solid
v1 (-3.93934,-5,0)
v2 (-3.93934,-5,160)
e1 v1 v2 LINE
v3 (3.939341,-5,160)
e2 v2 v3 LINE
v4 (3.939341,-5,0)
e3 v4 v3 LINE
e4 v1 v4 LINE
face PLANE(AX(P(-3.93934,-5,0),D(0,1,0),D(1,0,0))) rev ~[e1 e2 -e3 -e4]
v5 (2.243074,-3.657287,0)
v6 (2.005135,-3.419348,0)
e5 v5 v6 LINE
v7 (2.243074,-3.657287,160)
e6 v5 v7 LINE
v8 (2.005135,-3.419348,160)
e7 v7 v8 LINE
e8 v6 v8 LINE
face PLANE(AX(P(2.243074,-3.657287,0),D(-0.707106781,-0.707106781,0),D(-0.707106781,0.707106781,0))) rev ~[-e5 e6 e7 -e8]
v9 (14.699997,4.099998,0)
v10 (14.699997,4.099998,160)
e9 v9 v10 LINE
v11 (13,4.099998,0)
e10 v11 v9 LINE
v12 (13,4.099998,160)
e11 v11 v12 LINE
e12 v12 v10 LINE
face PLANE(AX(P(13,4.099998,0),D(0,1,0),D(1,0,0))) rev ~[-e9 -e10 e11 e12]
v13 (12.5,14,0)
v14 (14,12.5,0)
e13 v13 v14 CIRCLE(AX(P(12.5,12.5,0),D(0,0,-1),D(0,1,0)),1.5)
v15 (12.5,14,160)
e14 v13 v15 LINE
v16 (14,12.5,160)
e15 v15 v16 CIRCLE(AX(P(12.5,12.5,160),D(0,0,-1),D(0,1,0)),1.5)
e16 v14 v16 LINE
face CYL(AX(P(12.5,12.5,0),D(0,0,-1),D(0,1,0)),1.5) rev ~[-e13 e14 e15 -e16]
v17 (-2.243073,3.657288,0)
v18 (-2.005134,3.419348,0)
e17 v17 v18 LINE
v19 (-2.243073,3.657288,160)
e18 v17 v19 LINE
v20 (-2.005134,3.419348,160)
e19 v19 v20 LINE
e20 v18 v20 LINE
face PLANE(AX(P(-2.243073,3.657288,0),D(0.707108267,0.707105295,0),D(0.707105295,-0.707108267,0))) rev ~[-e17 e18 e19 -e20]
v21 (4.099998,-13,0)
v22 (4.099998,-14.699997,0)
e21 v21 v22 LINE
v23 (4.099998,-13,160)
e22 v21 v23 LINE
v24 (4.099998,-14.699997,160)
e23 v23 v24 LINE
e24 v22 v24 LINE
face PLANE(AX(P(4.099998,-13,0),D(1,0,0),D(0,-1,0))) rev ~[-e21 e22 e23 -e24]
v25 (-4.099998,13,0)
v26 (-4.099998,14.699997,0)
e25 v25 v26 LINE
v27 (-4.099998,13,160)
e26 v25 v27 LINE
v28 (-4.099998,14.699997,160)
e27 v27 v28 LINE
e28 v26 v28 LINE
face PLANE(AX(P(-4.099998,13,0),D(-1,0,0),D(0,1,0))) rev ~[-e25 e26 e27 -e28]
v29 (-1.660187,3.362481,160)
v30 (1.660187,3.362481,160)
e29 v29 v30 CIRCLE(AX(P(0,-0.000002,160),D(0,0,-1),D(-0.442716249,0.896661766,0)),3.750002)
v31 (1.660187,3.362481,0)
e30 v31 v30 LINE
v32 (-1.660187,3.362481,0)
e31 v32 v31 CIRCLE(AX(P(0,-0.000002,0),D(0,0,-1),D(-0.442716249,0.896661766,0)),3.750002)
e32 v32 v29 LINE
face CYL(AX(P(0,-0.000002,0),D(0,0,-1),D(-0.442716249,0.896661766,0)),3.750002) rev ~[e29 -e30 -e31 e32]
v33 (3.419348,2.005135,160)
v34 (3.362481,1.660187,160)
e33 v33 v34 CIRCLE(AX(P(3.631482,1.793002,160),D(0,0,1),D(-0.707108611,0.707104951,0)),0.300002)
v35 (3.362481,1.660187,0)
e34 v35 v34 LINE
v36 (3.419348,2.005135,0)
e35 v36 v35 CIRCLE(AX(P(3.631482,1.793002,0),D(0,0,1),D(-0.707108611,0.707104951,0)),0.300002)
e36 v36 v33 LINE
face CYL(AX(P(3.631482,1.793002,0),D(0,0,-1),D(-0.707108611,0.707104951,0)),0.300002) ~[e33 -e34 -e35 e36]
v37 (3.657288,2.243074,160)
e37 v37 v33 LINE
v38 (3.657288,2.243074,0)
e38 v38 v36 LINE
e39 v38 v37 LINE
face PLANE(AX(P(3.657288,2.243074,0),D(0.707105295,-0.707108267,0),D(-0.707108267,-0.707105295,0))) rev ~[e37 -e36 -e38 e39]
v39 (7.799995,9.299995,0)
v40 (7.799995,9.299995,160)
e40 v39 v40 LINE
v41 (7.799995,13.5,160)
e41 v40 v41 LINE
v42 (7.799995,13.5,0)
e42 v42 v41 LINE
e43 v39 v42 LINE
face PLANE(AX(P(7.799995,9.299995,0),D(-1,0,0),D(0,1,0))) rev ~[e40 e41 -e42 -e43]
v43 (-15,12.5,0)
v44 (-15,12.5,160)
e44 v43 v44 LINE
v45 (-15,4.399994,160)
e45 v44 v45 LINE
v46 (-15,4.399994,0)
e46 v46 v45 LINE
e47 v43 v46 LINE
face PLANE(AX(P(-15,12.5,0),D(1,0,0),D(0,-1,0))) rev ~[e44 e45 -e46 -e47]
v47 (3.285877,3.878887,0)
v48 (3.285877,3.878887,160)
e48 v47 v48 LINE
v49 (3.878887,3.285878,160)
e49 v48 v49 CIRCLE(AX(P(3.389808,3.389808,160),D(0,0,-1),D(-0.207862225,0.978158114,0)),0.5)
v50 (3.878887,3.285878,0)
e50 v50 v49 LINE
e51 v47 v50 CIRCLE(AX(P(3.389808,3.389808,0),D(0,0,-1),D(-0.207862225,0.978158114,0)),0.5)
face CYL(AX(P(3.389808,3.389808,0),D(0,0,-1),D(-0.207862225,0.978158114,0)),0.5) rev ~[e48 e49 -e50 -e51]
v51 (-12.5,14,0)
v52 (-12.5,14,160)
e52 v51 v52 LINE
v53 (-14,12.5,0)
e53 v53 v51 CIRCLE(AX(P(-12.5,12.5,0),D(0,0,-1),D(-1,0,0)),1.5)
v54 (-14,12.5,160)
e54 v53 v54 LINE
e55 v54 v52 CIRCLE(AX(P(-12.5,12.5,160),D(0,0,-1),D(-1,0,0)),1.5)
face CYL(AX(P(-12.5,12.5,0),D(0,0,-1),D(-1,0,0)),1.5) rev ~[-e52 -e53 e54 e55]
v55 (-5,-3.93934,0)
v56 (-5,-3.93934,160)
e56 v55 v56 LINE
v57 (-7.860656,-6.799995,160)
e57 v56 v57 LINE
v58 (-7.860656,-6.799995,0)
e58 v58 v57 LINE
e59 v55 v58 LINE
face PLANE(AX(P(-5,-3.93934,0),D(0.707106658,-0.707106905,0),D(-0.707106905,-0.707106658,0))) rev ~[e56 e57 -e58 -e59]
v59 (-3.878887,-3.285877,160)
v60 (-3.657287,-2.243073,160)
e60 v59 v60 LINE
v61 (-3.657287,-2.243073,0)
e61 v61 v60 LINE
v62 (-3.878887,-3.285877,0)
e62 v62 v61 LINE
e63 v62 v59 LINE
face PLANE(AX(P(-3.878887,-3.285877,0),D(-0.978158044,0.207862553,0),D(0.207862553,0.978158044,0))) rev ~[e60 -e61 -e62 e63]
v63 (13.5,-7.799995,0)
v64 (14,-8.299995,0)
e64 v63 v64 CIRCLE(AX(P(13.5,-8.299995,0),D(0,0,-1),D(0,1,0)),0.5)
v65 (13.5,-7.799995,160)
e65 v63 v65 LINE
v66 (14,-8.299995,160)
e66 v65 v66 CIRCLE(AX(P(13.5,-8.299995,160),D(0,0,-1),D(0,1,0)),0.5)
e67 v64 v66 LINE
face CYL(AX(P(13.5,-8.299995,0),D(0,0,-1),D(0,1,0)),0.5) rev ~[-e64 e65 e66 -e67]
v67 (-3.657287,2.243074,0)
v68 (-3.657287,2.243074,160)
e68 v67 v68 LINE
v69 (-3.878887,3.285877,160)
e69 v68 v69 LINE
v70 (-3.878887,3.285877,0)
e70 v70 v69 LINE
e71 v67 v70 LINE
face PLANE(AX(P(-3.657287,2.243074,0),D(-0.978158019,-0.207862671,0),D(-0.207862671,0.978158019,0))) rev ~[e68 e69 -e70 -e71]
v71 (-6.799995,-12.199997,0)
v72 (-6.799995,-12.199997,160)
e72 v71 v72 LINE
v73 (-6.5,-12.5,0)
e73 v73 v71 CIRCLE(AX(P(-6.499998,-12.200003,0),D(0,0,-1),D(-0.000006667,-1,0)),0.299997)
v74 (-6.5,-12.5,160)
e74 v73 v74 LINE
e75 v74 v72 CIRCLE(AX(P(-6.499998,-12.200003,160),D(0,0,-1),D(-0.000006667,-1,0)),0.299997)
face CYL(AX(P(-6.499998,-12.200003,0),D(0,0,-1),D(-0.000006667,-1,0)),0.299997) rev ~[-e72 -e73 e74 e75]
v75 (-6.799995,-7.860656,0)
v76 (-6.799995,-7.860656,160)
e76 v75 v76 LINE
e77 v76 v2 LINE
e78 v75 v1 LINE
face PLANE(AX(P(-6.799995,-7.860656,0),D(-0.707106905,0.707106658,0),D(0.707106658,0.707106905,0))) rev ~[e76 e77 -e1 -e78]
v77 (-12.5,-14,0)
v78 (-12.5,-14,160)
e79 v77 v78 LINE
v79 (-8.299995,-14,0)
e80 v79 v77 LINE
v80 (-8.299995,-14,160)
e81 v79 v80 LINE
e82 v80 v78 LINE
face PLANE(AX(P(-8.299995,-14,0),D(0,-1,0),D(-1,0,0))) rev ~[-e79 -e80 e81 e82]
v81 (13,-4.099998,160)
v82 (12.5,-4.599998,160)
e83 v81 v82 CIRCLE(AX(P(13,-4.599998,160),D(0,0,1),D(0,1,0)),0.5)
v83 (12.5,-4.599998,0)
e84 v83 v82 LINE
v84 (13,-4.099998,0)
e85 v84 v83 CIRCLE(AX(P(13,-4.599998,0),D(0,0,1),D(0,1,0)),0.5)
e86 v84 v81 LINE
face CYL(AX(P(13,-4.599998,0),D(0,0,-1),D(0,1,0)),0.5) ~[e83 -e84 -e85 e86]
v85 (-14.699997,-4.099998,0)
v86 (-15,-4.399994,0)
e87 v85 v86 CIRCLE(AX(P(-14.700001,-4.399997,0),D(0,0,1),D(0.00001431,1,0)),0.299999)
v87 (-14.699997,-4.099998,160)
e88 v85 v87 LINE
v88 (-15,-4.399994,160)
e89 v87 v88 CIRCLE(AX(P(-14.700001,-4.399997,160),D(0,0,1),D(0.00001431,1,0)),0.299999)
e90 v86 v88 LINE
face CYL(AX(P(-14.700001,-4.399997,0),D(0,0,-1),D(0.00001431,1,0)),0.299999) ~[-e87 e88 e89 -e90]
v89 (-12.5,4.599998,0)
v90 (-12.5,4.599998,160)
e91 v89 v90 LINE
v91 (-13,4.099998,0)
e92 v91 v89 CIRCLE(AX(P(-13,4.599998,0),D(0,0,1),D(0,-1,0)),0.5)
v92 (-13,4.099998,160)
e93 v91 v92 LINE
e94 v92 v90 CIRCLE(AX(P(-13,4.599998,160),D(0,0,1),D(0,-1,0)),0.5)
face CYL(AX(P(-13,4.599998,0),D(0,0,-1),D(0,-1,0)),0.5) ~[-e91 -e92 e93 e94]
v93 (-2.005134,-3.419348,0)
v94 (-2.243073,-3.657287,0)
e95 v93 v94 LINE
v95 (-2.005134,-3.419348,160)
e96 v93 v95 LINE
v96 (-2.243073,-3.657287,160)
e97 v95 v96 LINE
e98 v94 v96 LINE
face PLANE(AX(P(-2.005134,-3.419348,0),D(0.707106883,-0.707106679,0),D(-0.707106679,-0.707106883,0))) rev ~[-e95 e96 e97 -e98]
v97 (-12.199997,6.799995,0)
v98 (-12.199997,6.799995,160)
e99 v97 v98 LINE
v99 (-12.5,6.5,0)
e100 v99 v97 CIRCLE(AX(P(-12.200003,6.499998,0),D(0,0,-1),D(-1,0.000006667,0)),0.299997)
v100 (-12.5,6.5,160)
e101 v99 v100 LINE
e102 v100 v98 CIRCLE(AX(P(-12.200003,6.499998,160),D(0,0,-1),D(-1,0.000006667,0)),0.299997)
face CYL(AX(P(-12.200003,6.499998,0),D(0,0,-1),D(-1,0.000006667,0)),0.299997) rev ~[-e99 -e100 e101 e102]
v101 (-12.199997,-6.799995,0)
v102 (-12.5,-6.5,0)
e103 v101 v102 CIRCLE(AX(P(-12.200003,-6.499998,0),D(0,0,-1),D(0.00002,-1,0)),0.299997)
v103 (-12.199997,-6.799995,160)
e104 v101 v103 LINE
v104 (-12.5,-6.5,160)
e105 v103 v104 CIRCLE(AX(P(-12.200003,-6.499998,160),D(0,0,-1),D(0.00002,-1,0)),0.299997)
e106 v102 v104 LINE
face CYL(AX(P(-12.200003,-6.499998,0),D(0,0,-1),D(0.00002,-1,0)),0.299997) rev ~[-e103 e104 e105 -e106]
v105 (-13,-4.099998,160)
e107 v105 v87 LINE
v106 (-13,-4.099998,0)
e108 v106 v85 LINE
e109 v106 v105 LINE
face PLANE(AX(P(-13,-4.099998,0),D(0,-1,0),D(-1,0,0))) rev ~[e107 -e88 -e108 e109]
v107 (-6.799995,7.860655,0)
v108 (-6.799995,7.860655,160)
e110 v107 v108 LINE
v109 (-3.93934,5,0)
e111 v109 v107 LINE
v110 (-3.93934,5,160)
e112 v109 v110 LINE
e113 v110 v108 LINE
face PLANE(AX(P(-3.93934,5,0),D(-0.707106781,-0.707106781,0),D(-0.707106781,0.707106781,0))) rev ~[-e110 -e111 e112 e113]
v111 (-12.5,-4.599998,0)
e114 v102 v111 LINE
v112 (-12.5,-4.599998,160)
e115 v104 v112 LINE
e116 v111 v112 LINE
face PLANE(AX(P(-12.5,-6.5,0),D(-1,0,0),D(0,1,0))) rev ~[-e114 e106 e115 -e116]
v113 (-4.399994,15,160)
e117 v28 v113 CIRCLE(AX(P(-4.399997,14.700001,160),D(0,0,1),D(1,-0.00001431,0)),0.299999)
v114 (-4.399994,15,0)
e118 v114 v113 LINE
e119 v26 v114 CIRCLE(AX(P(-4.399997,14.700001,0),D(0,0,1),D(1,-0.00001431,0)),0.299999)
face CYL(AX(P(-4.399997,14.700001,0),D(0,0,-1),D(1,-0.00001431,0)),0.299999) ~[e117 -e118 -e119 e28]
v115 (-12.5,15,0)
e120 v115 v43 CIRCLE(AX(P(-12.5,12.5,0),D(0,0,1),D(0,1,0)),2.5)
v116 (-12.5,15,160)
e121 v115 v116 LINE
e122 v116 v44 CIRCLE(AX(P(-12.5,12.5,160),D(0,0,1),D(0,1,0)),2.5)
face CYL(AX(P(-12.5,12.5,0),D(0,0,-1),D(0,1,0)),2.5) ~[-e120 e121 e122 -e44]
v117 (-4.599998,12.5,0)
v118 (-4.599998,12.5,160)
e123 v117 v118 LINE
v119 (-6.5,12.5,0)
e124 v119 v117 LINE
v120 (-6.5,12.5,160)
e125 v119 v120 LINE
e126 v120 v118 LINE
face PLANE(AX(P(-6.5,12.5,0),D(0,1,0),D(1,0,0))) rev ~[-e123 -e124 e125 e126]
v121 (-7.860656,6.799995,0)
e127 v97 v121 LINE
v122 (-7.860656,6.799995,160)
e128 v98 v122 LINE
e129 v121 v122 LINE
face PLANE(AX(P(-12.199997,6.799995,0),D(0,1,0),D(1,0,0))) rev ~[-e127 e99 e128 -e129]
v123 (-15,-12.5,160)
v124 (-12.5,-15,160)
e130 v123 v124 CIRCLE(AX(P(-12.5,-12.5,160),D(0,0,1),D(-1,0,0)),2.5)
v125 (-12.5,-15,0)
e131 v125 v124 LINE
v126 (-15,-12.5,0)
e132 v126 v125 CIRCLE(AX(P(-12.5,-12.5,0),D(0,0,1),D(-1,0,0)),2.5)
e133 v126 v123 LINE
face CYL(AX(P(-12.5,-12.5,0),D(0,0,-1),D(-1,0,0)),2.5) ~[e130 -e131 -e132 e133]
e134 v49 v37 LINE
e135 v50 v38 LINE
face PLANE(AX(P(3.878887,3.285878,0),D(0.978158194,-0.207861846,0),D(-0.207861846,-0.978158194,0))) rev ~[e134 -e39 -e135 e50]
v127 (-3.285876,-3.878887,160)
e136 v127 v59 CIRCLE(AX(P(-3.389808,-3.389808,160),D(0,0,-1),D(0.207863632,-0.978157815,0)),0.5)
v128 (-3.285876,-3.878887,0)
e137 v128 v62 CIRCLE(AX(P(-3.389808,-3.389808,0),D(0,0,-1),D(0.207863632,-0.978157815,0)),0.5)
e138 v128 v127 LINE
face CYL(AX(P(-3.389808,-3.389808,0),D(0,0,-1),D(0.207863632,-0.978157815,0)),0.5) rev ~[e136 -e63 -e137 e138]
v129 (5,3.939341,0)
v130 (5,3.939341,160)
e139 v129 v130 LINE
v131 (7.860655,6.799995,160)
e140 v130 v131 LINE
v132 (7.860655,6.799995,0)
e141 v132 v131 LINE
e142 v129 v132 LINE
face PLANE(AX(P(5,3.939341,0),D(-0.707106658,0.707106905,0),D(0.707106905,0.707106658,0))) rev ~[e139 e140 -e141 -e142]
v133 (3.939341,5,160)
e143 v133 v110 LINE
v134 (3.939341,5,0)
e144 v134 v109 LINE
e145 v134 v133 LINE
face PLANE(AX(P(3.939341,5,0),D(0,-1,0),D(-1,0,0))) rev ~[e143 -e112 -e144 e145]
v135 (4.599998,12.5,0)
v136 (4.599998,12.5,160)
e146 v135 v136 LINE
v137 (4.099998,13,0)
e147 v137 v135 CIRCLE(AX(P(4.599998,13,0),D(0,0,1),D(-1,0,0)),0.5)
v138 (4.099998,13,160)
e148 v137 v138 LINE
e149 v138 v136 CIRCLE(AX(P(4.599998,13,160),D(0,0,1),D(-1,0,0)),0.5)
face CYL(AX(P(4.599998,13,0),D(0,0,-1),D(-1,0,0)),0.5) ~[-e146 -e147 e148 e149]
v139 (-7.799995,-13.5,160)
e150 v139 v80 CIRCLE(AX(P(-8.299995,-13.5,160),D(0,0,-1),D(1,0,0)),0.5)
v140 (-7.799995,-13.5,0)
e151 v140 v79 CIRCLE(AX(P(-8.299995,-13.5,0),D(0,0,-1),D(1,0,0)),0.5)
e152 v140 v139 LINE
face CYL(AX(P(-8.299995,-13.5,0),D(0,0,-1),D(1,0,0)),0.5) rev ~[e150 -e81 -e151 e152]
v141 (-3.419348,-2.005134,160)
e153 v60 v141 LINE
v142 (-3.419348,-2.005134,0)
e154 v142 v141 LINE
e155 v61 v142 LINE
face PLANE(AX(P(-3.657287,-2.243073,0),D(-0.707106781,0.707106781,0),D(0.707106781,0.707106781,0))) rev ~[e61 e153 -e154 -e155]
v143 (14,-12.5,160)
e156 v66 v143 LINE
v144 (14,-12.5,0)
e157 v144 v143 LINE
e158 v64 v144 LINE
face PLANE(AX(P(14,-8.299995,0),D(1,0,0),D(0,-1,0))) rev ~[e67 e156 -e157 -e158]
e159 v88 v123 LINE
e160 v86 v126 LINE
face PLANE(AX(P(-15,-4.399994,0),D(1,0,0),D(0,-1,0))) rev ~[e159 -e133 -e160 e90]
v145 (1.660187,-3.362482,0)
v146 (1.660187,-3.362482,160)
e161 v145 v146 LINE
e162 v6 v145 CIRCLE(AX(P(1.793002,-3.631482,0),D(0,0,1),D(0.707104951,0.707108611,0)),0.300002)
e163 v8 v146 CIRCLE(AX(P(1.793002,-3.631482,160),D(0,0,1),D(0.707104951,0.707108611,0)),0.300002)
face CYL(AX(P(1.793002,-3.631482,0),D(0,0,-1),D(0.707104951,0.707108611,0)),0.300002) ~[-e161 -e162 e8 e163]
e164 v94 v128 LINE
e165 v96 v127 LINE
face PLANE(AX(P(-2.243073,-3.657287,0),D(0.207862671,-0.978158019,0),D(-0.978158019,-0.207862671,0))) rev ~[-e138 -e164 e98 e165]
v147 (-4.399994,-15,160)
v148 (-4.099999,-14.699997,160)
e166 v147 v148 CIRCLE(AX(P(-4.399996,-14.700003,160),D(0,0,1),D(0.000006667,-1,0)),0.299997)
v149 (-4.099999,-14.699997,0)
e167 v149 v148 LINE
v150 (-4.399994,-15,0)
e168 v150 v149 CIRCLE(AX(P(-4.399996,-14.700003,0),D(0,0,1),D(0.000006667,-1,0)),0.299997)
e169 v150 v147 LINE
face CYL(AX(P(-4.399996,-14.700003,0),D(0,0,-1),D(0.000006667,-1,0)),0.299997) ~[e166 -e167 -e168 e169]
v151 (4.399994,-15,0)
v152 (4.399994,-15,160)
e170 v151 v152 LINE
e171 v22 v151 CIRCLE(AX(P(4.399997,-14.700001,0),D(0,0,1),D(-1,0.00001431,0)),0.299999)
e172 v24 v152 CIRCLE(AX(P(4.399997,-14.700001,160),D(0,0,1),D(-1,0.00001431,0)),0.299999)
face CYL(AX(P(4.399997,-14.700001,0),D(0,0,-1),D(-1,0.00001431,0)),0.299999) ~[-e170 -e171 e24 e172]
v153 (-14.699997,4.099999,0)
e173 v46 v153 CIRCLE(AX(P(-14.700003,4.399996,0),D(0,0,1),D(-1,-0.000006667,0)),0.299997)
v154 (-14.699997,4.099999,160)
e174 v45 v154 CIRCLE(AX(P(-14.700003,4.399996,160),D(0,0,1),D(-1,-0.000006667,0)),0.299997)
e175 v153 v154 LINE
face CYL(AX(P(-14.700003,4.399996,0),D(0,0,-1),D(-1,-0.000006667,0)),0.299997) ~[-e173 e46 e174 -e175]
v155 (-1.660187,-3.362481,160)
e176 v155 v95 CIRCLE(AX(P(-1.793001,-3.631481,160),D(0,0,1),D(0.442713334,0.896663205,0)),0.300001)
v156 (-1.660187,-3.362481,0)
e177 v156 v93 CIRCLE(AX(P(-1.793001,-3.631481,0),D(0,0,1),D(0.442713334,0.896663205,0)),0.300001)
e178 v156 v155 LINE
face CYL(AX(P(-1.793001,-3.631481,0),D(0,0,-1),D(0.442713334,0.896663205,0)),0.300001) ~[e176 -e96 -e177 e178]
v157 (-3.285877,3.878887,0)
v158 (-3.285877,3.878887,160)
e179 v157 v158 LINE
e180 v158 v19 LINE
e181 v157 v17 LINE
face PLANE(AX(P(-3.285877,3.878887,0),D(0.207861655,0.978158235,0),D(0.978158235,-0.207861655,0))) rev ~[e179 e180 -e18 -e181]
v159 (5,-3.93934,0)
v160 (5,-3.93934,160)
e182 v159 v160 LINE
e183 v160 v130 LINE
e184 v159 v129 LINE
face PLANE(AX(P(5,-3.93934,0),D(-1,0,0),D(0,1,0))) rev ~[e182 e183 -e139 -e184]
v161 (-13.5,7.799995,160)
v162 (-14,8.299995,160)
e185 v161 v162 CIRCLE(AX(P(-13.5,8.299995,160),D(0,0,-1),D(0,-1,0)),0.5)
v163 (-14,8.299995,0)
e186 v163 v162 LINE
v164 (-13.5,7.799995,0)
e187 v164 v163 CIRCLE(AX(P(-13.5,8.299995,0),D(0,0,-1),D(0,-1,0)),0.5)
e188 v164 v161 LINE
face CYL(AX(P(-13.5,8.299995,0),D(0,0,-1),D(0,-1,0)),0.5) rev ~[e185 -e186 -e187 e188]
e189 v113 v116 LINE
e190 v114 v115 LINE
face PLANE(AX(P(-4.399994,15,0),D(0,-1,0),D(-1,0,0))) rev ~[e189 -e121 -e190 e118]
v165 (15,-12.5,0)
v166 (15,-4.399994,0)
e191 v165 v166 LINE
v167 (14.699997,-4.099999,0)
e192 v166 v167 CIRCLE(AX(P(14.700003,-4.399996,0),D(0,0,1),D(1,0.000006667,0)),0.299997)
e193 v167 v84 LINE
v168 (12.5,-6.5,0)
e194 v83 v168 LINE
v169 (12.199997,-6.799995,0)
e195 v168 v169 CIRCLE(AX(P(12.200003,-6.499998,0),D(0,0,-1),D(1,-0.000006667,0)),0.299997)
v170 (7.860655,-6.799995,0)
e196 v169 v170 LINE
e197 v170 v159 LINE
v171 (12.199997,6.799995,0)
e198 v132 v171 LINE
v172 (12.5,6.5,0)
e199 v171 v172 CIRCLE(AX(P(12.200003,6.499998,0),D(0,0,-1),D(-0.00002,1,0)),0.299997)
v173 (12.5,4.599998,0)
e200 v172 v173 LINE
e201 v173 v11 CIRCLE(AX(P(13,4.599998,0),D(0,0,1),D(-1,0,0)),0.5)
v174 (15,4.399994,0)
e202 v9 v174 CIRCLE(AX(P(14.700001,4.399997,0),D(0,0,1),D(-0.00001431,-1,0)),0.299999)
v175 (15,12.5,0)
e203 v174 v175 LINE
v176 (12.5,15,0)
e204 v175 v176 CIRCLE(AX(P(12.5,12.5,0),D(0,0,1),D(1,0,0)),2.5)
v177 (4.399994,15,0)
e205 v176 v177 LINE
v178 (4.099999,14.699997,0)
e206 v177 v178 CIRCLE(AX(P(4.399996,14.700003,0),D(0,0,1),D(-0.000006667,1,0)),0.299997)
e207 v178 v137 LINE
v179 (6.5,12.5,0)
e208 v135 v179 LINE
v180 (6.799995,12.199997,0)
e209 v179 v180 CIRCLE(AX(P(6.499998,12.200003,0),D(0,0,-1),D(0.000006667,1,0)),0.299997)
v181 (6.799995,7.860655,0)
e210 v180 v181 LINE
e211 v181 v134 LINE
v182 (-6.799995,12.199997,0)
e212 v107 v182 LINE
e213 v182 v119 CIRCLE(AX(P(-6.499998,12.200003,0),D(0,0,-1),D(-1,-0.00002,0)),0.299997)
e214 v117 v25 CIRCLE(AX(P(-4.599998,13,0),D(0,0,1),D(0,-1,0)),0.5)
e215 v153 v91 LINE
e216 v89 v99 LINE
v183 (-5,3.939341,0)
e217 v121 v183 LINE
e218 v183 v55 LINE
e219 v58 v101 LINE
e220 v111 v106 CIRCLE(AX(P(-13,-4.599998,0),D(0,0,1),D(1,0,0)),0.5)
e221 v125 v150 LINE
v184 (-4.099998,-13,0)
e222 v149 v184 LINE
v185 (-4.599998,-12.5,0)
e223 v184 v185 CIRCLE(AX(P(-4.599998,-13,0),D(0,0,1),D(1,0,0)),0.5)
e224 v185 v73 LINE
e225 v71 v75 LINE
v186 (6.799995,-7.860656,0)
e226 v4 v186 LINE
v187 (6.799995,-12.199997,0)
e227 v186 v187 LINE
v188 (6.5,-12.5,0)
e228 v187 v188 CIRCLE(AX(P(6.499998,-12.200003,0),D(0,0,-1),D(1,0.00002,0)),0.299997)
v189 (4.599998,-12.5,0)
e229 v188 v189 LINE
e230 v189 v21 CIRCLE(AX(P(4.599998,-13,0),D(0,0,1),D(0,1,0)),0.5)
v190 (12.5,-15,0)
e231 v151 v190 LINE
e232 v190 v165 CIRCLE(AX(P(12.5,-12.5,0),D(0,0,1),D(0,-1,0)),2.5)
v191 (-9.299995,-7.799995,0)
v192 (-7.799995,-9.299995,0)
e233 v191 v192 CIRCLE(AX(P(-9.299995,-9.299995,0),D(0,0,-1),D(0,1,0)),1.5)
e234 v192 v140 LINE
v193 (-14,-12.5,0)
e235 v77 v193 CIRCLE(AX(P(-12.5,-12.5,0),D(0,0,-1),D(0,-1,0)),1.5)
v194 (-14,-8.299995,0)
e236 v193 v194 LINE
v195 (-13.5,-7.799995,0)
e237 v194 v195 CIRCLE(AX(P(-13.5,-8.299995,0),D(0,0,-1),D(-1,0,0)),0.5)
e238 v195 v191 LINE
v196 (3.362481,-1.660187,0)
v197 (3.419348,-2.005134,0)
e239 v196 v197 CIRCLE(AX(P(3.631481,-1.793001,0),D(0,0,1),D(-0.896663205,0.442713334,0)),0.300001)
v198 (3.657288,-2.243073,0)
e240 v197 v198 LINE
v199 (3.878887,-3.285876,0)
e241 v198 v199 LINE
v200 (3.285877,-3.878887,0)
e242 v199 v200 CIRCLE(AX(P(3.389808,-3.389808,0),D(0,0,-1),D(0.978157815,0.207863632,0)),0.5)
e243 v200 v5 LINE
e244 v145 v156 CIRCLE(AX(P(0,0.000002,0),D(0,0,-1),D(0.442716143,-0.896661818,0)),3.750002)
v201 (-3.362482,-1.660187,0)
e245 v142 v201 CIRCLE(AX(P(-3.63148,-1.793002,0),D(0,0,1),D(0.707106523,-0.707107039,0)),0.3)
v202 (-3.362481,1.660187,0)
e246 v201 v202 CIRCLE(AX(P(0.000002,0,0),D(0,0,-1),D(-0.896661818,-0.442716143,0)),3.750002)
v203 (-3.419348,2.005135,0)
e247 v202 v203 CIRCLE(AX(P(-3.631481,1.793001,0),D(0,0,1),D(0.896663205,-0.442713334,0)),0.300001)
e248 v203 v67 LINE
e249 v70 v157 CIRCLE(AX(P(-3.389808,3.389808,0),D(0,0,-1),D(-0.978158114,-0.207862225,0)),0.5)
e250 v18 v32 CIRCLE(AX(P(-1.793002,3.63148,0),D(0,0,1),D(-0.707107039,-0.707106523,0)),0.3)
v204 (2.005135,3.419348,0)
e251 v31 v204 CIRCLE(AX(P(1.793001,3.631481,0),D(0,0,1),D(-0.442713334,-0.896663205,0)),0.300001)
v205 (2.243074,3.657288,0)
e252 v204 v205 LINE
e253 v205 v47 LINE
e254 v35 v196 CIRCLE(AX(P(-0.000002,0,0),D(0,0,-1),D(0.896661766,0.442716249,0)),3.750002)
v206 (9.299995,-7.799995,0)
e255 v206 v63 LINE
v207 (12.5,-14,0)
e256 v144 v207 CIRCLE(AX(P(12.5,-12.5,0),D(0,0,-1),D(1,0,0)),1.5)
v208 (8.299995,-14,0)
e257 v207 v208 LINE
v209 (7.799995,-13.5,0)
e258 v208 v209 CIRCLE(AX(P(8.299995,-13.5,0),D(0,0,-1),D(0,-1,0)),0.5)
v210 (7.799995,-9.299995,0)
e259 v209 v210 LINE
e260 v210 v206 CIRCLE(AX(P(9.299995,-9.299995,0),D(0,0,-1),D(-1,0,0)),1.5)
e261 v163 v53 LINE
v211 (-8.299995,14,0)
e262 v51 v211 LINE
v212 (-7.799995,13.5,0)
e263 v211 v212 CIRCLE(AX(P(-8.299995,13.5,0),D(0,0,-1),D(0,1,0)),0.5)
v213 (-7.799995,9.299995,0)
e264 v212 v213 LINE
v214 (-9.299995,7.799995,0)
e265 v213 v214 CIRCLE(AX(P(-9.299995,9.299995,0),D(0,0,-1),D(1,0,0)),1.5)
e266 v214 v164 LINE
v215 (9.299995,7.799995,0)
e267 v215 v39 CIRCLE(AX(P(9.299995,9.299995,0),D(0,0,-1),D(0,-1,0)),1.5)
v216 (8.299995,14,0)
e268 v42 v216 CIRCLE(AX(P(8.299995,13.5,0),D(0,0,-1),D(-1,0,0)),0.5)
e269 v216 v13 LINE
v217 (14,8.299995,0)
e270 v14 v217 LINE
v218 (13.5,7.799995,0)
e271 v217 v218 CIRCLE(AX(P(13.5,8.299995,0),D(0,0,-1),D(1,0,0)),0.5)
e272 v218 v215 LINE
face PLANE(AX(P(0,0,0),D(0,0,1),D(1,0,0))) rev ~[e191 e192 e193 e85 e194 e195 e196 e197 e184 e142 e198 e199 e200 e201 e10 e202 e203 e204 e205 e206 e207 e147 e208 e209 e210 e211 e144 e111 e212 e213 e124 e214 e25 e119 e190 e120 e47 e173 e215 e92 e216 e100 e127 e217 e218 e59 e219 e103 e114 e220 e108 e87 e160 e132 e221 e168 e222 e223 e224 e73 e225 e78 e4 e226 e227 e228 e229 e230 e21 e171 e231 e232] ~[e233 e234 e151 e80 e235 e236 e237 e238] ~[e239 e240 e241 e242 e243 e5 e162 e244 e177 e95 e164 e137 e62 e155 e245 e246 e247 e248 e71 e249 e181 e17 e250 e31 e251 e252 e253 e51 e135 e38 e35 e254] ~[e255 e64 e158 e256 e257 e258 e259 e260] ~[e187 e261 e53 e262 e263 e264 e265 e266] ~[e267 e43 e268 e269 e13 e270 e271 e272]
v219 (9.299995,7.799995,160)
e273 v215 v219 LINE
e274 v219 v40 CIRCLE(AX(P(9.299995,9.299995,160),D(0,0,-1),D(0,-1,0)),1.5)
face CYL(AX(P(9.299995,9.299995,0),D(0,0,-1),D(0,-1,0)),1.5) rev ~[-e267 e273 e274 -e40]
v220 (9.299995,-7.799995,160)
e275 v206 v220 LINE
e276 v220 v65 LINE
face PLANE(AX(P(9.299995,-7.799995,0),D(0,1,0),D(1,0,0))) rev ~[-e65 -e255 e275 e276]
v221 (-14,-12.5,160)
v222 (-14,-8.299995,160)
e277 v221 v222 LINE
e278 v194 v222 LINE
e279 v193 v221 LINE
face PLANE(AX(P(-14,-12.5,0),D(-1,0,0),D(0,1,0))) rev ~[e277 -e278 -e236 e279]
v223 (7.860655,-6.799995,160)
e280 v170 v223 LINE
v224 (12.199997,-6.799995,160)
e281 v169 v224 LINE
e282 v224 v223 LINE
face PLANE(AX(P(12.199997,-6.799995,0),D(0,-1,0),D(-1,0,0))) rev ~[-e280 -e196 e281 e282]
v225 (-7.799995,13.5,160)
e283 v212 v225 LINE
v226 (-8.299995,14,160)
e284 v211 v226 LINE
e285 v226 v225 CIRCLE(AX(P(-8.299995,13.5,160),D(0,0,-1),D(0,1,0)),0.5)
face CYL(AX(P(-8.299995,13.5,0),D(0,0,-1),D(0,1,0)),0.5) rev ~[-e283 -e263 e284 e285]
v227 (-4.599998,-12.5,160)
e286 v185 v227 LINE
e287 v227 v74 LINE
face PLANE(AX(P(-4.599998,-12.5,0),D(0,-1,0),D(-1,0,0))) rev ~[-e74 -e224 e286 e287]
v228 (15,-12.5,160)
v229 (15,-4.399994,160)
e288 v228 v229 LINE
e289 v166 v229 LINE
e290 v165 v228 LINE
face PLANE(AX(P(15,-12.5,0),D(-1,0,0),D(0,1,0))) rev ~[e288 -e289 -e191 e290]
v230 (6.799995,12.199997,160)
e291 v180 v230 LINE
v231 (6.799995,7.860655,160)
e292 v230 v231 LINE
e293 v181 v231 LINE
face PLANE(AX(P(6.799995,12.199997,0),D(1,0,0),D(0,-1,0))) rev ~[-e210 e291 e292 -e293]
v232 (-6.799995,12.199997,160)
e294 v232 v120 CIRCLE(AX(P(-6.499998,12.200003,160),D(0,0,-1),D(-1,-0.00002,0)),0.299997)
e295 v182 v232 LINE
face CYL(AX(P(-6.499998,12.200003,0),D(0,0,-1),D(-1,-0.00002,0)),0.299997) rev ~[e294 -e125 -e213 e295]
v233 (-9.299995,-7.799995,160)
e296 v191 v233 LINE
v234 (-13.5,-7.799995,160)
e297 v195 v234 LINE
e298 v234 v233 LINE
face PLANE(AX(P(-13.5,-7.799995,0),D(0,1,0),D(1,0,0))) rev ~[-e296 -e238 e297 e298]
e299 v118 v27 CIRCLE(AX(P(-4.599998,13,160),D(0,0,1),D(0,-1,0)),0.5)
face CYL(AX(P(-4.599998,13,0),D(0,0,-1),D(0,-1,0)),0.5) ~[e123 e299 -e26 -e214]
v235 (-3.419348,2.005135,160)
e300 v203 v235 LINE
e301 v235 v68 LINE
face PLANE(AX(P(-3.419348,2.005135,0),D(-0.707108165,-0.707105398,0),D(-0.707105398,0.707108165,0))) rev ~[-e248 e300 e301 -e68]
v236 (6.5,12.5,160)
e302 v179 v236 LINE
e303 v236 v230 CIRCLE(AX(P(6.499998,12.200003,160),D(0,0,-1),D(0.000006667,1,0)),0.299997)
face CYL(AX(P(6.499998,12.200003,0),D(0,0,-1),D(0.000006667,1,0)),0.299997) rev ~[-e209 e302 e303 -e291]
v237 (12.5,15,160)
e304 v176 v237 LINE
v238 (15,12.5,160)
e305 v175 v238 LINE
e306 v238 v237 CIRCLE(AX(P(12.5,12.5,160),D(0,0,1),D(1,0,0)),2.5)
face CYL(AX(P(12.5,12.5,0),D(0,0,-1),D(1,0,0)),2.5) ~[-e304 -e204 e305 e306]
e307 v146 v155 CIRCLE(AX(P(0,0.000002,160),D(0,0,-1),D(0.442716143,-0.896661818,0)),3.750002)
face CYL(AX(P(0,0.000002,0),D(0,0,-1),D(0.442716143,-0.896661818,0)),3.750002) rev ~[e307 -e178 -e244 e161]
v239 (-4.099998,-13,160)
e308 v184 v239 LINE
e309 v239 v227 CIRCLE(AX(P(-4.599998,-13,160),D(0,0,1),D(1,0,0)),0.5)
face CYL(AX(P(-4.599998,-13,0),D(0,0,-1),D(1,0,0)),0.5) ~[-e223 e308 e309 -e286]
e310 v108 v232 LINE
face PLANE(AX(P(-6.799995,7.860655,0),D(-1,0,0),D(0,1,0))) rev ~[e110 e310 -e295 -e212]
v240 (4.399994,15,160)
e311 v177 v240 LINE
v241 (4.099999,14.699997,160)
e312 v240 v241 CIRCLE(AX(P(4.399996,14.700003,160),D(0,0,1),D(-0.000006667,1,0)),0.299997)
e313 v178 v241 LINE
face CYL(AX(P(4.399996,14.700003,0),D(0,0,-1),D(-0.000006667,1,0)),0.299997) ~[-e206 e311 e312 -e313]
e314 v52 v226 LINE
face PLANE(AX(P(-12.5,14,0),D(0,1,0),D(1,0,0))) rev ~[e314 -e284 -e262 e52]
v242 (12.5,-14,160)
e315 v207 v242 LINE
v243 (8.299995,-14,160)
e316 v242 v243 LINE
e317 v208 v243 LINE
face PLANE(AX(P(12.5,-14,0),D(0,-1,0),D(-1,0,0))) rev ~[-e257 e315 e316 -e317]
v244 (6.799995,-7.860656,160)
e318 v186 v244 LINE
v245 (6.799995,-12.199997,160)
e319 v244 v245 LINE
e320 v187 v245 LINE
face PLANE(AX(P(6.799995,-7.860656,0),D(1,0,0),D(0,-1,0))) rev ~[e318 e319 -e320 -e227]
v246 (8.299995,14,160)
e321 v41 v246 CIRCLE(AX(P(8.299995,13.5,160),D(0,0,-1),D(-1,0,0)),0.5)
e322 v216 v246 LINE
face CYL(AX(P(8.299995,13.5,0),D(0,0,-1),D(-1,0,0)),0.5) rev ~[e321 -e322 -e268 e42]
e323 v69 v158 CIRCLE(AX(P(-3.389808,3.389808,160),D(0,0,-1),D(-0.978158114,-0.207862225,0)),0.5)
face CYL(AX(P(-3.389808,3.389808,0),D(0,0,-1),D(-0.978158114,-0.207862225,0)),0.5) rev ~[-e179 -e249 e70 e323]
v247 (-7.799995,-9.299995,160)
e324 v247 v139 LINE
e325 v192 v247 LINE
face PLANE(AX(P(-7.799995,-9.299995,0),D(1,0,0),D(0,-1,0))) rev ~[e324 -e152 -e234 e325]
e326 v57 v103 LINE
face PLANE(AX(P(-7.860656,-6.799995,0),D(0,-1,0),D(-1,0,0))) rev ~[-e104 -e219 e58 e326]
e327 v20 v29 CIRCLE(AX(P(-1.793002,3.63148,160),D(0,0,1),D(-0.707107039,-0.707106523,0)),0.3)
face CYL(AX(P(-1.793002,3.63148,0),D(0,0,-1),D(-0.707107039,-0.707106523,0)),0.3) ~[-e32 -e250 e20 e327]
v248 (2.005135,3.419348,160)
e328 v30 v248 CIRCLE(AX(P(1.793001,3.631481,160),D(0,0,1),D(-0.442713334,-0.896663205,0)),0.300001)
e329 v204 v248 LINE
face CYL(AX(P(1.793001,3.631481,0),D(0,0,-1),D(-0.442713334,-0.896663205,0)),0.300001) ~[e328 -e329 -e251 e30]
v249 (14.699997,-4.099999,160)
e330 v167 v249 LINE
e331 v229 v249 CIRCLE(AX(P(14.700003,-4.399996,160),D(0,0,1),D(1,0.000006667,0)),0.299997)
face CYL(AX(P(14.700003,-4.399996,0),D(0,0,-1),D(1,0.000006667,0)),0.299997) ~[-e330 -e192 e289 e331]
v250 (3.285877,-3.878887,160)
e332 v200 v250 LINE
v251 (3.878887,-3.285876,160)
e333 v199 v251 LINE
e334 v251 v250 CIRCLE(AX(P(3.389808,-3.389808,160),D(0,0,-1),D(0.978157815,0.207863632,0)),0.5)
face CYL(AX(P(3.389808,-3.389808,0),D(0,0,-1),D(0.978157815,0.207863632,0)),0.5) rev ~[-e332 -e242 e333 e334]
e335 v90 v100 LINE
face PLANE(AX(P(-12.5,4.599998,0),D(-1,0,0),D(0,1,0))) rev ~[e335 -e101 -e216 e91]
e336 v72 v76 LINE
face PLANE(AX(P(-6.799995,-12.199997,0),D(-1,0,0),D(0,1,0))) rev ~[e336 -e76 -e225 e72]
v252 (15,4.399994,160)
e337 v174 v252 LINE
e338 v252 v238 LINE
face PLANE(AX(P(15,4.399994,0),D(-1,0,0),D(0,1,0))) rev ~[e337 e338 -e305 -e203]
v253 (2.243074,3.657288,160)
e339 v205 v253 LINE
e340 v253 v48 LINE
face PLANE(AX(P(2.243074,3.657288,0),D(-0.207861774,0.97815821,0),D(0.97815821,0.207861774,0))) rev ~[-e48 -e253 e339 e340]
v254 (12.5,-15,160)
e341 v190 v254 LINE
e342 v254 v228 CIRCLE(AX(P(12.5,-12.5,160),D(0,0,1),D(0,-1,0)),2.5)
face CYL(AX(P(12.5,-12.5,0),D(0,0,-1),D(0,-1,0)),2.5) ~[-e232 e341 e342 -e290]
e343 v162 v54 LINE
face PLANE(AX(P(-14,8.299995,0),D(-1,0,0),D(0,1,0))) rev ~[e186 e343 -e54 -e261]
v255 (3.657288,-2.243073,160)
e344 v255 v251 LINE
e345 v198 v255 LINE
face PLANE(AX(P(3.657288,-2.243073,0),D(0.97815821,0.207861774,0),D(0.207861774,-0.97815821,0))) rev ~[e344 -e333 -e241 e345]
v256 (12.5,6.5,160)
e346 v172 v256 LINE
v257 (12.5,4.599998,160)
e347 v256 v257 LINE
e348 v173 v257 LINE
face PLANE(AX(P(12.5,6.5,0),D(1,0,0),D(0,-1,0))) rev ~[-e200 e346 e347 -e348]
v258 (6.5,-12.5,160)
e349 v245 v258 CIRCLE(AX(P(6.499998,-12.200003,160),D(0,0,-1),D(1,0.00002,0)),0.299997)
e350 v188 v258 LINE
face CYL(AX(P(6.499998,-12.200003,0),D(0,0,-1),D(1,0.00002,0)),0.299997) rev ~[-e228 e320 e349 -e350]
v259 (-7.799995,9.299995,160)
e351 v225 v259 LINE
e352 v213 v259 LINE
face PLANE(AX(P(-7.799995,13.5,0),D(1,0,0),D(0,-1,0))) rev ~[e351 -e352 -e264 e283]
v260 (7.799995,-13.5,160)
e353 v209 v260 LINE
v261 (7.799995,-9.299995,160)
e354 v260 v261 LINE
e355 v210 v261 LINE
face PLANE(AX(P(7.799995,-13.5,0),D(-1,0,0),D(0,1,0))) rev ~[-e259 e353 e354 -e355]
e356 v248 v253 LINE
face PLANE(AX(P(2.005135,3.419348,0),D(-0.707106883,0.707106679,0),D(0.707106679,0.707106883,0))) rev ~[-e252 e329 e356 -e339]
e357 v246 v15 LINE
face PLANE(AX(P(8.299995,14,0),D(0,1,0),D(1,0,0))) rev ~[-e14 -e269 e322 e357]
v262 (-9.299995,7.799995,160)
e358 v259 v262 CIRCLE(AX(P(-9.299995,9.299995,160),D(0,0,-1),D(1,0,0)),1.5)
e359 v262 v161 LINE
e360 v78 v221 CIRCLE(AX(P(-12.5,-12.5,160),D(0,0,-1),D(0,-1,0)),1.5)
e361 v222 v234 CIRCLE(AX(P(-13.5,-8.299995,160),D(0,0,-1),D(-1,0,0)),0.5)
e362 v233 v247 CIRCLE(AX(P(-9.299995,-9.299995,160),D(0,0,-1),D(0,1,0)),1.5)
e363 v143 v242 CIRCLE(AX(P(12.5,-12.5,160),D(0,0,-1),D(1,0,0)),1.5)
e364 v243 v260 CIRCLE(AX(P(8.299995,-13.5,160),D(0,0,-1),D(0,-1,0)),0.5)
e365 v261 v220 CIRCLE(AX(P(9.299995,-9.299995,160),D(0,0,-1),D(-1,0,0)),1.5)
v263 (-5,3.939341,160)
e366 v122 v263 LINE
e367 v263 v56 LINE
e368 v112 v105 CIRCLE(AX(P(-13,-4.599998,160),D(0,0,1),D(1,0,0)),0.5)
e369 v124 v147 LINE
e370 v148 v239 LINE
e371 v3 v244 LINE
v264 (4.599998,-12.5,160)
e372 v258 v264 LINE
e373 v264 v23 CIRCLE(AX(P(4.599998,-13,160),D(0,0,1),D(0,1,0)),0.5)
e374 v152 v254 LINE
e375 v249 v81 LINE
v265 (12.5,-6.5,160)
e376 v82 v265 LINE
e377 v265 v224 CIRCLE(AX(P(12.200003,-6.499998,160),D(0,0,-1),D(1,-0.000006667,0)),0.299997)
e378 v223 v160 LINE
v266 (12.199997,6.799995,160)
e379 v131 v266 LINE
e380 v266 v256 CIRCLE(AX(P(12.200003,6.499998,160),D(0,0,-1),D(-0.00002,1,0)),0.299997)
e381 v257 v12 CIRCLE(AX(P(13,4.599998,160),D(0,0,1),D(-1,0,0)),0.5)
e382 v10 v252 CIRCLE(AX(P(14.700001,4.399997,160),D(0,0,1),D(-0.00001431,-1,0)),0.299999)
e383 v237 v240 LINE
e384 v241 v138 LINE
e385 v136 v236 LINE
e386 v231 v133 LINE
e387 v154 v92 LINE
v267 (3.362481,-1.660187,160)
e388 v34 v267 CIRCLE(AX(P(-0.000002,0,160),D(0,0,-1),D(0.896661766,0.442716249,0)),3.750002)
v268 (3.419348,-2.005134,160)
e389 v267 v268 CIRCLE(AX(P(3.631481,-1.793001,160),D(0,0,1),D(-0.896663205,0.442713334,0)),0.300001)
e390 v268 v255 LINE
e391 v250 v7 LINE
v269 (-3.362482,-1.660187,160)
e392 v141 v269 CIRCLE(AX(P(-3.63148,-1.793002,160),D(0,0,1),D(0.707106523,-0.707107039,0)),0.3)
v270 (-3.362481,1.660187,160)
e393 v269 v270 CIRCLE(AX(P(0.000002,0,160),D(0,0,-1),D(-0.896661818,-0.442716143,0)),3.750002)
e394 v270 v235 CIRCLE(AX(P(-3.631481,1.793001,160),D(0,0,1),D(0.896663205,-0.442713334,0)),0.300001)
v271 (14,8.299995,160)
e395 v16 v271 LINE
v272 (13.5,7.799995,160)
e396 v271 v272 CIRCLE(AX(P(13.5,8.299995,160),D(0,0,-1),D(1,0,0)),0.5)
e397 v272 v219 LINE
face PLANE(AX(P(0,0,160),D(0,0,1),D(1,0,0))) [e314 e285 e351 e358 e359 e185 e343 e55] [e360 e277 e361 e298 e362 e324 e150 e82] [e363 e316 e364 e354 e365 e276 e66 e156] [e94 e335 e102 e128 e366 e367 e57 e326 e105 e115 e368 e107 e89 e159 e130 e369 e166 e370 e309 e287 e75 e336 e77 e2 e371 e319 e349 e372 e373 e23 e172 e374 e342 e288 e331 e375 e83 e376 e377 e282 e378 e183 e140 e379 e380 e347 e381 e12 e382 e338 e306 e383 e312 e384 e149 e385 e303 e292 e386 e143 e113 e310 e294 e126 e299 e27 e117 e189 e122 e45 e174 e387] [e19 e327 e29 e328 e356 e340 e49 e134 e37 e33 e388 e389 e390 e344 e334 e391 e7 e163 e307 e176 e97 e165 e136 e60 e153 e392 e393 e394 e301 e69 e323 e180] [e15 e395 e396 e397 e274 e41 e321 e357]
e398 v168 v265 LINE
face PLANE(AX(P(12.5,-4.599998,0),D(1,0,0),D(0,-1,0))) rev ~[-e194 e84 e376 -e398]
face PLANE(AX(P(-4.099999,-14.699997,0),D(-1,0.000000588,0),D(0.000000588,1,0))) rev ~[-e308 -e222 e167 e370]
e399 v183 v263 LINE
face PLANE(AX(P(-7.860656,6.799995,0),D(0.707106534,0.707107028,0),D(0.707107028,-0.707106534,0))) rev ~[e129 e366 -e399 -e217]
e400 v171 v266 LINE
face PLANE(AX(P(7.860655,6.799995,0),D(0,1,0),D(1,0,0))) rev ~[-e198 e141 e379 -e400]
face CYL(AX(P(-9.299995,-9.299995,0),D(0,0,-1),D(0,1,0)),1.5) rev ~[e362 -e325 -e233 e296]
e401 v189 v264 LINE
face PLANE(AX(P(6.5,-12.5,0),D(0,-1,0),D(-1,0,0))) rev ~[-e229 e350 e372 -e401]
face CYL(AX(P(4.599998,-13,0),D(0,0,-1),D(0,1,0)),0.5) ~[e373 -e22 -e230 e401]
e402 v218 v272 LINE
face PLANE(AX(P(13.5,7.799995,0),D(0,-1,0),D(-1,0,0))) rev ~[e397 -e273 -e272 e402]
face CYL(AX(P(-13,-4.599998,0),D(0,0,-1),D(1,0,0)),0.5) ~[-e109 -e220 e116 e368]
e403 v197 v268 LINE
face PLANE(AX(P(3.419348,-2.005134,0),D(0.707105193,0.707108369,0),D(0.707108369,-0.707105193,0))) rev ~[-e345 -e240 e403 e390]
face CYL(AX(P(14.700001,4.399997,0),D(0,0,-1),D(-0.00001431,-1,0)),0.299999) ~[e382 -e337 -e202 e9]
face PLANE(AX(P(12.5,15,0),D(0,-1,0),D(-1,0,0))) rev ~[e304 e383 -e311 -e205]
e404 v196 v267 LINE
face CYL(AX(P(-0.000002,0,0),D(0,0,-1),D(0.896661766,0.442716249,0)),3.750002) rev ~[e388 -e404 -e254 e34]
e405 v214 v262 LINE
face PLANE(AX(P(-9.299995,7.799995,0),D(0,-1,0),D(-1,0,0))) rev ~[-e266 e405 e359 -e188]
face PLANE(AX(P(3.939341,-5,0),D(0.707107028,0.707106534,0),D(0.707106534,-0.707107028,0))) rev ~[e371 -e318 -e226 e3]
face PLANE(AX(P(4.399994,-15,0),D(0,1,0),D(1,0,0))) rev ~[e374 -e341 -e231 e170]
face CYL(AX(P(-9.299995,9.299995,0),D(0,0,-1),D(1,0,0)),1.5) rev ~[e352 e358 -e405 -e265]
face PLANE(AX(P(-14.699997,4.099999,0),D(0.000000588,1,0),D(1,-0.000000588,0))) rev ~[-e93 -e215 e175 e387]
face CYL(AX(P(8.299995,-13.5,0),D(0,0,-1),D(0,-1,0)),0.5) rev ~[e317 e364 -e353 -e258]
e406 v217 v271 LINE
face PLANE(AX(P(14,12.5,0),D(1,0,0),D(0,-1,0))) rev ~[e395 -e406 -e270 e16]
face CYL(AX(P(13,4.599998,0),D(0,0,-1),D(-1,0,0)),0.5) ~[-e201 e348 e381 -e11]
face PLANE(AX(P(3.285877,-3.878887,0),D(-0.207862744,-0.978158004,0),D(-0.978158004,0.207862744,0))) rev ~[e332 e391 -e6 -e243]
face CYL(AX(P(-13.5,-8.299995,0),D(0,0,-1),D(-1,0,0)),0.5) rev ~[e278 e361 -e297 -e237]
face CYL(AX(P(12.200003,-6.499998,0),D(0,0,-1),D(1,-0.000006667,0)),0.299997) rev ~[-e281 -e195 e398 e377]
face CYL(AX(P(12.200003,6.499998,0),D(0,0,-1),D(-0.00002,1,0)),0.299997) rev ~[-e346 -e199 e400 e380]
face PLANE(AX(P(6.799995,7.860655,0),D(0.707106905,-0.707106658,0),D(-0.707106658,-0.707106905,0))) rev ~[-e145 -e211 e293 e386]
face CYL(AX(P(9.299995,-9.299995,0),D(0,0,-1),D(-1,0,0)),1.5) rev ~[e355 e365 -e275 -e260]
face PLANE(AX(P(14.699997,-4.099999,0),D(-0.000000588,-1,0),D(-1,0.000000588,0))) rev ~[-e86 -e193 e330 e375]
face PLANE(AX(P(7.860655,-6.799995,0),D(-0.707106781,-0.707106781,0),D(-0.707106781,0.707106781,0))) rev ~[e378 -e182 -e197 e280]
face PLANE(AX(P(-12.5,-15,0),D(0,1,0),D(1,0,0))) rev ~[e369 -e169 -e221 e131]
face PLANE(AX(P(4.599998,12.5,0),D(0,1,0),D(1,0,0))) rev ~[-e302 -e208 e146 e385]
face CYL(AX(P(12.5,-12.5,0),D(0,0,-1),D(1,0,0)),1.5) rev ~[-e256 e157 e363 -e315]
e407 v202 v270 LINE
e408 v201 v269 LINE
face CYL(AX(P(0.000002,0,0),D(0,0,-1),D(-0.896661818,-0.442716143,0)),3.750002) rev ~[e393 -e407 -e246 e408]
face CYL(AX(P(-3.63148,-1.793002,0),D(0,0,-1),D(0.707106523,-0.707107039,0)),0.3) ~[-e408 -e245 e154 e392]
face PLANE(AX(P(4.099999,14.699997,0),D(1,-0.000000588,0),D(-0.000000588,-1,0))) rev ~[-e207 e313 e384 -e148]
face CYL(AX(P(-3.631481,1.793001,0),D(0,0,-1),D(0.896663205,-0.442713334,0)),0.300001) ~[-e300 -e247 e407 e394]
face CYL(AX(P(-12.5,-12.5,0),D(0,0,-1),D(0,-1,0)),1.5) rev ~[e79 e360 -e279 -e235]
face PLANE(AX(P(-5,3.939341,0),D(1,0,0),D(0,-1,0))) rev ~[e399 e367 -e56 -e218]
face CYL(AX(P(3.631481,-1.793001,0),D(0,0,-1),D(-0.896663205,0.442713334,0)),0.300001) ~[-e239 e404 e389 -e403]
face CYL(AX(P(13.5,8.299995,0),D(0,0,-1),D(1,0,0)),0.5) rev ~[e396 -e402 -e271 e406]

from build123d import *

# Parameters (mm, degrees)
F1_DEPTH = 160


# Not quite as in the source:
# - ends of sketch curves that miss each other by under 0.0002 mm in the source are joined
# - the program builds the solid bodies; features that only make, move or delete a surface that nothing else refers to are left out


with BuildPart() as f1:
    # F0 (on Top) → F1 (new body)
    with BuildSketch(Plane.XY):
        with BuildLine():
            Line((3.939341, -5), (6.799995, -7.860656))
            Line((6.799995, -7.860656), (6.799995, -12.199997))
            ThreePointArc((6.799995, -12.199997), (6.7121307415, -12.4121300846), (6.5, -12.5))
            Line((6.5, -12.5), (4.599998, -12.5))
            ThreePointArc((4.599998, -12.5), (4.2464446094, -12.6464466094), (4.099998, -13))
            Line((4.099998, -13), (4.099998, -14.699997))
            ThreePointArc((4.099998, -14.699997), (4.1878632585, -14.9121300846), (4.399994, -15))
            Line((4.399994, -15), (12.5, -15))
            ThreePointArc((12.5, -15), (14.267766953, -14.267766953), (15, -12.5))
            Line((15, -12.5), (15, -4.399994))
            ThreePointArc((15, -4.399994), (14.9121300846, -4.1878632585), (14.699997, -4.099999))
            Line((14.699997, -4.099999), (13, -4.099998))
            ThreePointArc((13, -4.099998), (12.6464466094, -4.2464446094), (12.5, -4.599998))
            Line((12.5, -4.599998), (12.5, -6.5))
            ThreePointArc((12.5, -6.5), (12.4121300846, -6.7121307415), (12.199997, -6.799995))
            Line((12.199997, -6.799995), (7.860655, -6.799995))
            Line((7.860655, -6.799995), (5, -3.93934))
            Line((5, -3.93934), (5, 3.939341))
            Line((5, 3.939341), (7.860655, 6.799995))
            Line((7.860655, 6.799995), (12.199997, 6.799995))
            ThreePointArc((12.199997, 6.799995), (12.4121300846, 6.7121307415), (12.5, 6.5))
            Line((12.5, 6.5), (12.5, 4.599998))
            ThreePointArc((12.5, 4.599998), (12.6464466094, 4.2464446094), (13, 4.099998))
            Line((13, 4.099998), (14.699997, 4.099998))
            ThreePointArc((14.699997, 4.099998), (14.9121300846, 4.1878632585), (15, 4.399994))
            Line((15, 4.399994), (15, 12.5))
            ThreePointArc((15, 12.5), (14.267766953, 14.267766953), (12.5, 15))
            Line((12.5, 15), (4.399994, 15))
            ThreePointArc((4.399994, 15), (4.1878632585, 14.9121300846), (4.099999, 14.699997))
            Line((4.099999, 14.699997), (4.099998, 13))
            ThreePointArc((4.099998, 13), (4.2464446094, 12.6464466094), (4.599998, 12.5))
            Line((4.599998, 12.5), (6.5, 12.5))
            ThreePointArc((6.5, 12.5), (6.7121307415, 12.4121300846), (6.799995, 12.199997))
            Line((6.799995, 12.199997), (6.799995, 7.860655))
            Line((6.799995, 7.860655), (3.939341, 5))
            Line((3.939341, 5), (-3.93934, 5))
            Line((-3.93934, 5), (-6.799995, 7.860655))
            Line((-6.799995, 7.860655), (-6.799995, 12.199997))
            ThreePointArc((-6.799995, 12.199997), (-6.7121307415, 12.4121300846), (-6.5, 12.5))
            Line((-6.5, 12.5), (-4.599998, 12.5))
            ThreePointArc((-4.599998, 12.5), (-4.2464446094, 12.6464466094), (-4.099998, 13))
            Line((-4.099998, 13), (-4.099998, 14.699997))
            ThreePointArc((-4.099998, 14.699997), (-4.1878632585, 14.9121300846), (-4.399994, 15))
            Line((-4.399994, 15), (-12.5, 15))
            ThreePointArc((-12.5, 15), (-14.267766953, 14.267766953), (-15, 12.5))
            Line((-15, 12.5), (-15, 4.399994))
            ThreePointArc((-15, 4.399994), (-14.9121300846, 4.1878632585), (-14.699997, 4.099999))
            Line((-14.699997, 4.099999), (-13, 4.099998))
            ThreePointArc((-13, 4.099998), (-12.6464466094, 4.2464446094), (-12.5, 4.599998))
            Line((-12.5, 4.599998), (-12.5, 6.5))
            ThreePointArc((-12.5, 6.5), (-12.4121300846, 6.7121307415), (-12.199997, 6.799995))
            Line((-12.199997, 6.799995), (-7.860656, 6.799995))
            Line((-7.860656, 6.799995), (-5, 3.939341))
            Line((-5, 3.939341), (-5, -3.93934))
            Line((-5, -3.93934), (-7.860656, -6.799995))
            Line((-7.860656, -6.799995), (-12.199997, -6.799995))
            ThreePointArc((-12.199997, -6.799995), (-12.4121300846, -6.7121307415), (-12.5, -6.5))
            Line((-12.5, -6.5), (-12.5, -4.599998))
            ThreePointArc((-12.5, -4.599998), (-12.6464466094, -4.2464446094), (-13, -4.099998))
            Line((-13, -4.099998), (-14.699997, -4.099998))
            ThreePointArc((-14.699997, -4.099998), (-14.9121300846, -4.1878632585), (-15, -4.399994))
            Line((-15, -4.399994), (-15, -12.5))
            ThreePointArc((-15, -12.5), (-14.267766953, -14.267766953), (-12.5, -15))
            Line((-12.5, -15), (-4.399994, -15))
            ThreePointArc((-4.399994, -15), (-4.1878632585, -14.9121300846), (-4.099999, -14.699997))
            Line((-4.099999, -14.699997), (-4.099998, -13))
            ThreePointArc((-4.099998, -13), (-4.2464446094, -12.6464466094), (-4.599998, -12.5))
            Line((-4.599998, -12.5), (-6.5, -12.5))
            ThreePointArc((-6.5, -12.5), (-6.7121307415, -12.4121300846), (-6.799995, -12.199997))
            Line((-6.799995, -12.199997), (-6.799995, -7.860656))
            Line((-6.799995, -7.860656), (-3.93934, -5))
            Line((-3.93934, -5), (3.939341, -5))
        make_face()
        with BuildLine():
            Line((-8.299995, -14), (-12.5, -14))
            ThreePointArc((-12.5, -14), (-13.5606601718, -13.5606601718), (-14, -12.5))
            Line((-14, -12.5), (-14, -8.299995))
            ThreePointArc((-14, -8.299995), (-13.8535533906, -7.9464416094), (-13.5, -7.799995))
            Line((-13.5, -7.799995), (-9.299995, -7.799995))
            ThreePointArc((-9.299995, -7.799995), (-8.2393348282, -8.2393348282), (-7.799995, -9.299995))
            Line((-7.799995, -9.299995), (-7.799995, -13.5))
            ThreePointArc((-7.799995, -13.5), (-7.9464416094, -13.8535533906), (-8.299995, -14))
        make_face(mode=Mode.SUBTRACT)
        with BuildLine():
            Line((12.5, -14), (8.299995, -14))
            ThreePointArc((8.299995, -14), (7.9464416094, -13.8535533906), (7.799995, -13.5))
            Line((7.799995, -13.5), (7.799995, -9.299995))
            ThreePointArc((7.799995, -9.299995), (8.2393348282, -8.2393348282), (9.299995, -7.799995))
            Line((9.299995, -7.799995), (13.5, -7.799995))
            ThreePointArc((13.5, -7.799995), (13.8535533906, -7.9464416094), (14, -8.299995))
            Line((14, -8.299995), (14, -12.5))
            ThreePointArc((14, -12.5), (13.5606601718, -13.5606601718), (12.5, -14))
        make_face(mode=Mode.SUBTRACT)
        with BuildLine():
            Line((3.657288, -2.243073), (3.878887, -3.285876))
            ThreePointArc((3.878887, -3.285876), (3.7433613906, -3.7433613906), (3.2858769836, -3.8788870773))
            Line((3.2858769836, -3.8788870773), (2.243074, -3.657287))
            Line((2.243074, -3.657287), (2.005135, -3.419348))
            ThreePointArc((2.005135, -3.419348), (1.841799908, -3.3354753308), (1.6601868142, -3.3624816237))
            ThreePointArc((1.6601868142, -3.3624816237), (0, -3.75), (-1.6601870383, -3.3624810777))
            ThreePointArc((-1.6601870383, -3.3624810777), (-1.841799908, -3.3354753308), (-2.0051340344, -3.4193479656))
            Line((-2.0051340344, -3.4193479656), (-2.243073, -3.657287))
            Line((-2.243073, -3.657287), (-3.285876, -3.878887))
            ThreePointArc((-3.285876, -3.878887), (-3.7433613906, -3.7433613906), (-3.8788870773, -3.2858769836))
            Line((-3.8788870773, -3.2858769836), (-3.657287, -2.243073))
            Line((-3.657287, -2.243073), (-3.419348, -2.005134))
            ThreePointArc((-3.419348, -2.005134), (-3.3354753308, -1.841799908), (-3.3624816237, -1.6601868142))
            ThreePointArc((-3.3624816237, -1.6601868142), (-3.75, 0), (-3.3624810777, 1.6601870383))
            ThreePointArc((-3.3624810777, 1.6601870383), (-3.3354753883, 1.8418002569), (-3.4193484656, 2.0051345344))
            Line((-3.4193484656, 2.0051345344), (-3.657287, 2.243074))
            Line((-3.657287, 2.243074), (-3.878887, 3.285877))
            ThreePointArc((-3.878887, 3.285877), (-3.7433613906, 3.7433613906), (-3.2858769836, 3.8788870773))
            Line((-3.2858769836, 3.8788870773), (-2.243073, 3.657288))
            Line((-2.243073, 3.657288), (-2.005134, 3.419348))
            ThreePointArc((-2.005134, 3.419348), (-1.8418001264, 3.3354753668), (-1.6601872112, 3.3624814277))
            ThreePointArc((-1.6601872112, 3.3624814277), (0, 3.75), (1.6601870383, 3.3624810777))
            ThreePointArc((1.6601870383, 3.3624810777), (1.8418002569, 3.3354753883), (2.0051345344, 3.4193484656))
            Line((2.0051345344, 3.4193484656), (2.243074, 3.657288))
            Line((2.243074, 3.657288), (3.285877, 3.878887))
            ThreePointArc((3.285877, 3.878887), (3.7433610448, 3.7433617364), (3.8788872806, 3.2858779404))
            Line((3.8788872806, 3.2858779404), (3.657288, 2.243074))
            Line((3.657288, 2.243074), (3.419348, 2.005135))
            ThreePointArc((3.419348, 2.005135), (3.3354753668, 1.8418001264), (3.3624814277, 1.6601872112))
            ThreePointArc((3.3624814277, 1.6601872112), (3.75, 0), (3.3624810777, -1.6601870383))
            ThreePointArc((3.3624810777, -1.6601870383), (3.3354753308, -1.841799908), (3.4193479656, -2.0051340344))
            Line((3.4193479656, -2.0051340344), (3.657288, -2.243073))
        make_face(mode=Mode.SUBTRACT)
        with BuildLine():
            Line((-9.299995, 7.799995), (-13.5, 7.799995))
            ThreePointArc((-13.5, 7.799995), (-13.8535533906, 7.9464416094), (-14, 8.299995))
            Line((-14, 8.299995), (-14, 12.5))
            ThreePointArc((-14, 12.5), (-13.5606601718, 13.5606601718), (-12.5, 14))
            Line((-12.5, 14), (-8.299995, 14))
            ThreePointArc((-8.299995, 14), (-7.9464416094, 13.8535533906), (-7.799995, 13.5))
            Line((-7.799995, 13.5), (-7.799995, 9.299995))
            ThreePointArc((-7.799995, 9.299995), (-8.2393348282, 8.2393348282), (-9.299995, 7.799995))
        make_face(mode=Mode.SUBTRACT)
        with BuildLine():
            Line((13.5, 7.799995), (9.299995, 7.799995))
            ThreePointArc((9.299995, 7.799995), (8.2393348282, 8.2393348282), (7.799995, 9.299995))
            Line((7.799995, 9.299995), (7.799995, 13.5))
            ThreePointArc((7.799995, 13.5), (7.9464416094, 13.8535533906), (8.299995, 14))
            Line((8.299995, 14), (12.5, 14))
            ThreePointArc((12.5, 14), (13.5606601718, 13.5606601718), (14, 12.5))
            Line((14, 12.5), (14, 8.299995))
            ThreePointArc((14, 8.299995), (13.8535533906, 7.9464416094), (13.5, 7.799995))
        make_face(mode=Mode.SUBTRACT)
    extrude(amount=F1_DEPTH)


solid = f1.part
